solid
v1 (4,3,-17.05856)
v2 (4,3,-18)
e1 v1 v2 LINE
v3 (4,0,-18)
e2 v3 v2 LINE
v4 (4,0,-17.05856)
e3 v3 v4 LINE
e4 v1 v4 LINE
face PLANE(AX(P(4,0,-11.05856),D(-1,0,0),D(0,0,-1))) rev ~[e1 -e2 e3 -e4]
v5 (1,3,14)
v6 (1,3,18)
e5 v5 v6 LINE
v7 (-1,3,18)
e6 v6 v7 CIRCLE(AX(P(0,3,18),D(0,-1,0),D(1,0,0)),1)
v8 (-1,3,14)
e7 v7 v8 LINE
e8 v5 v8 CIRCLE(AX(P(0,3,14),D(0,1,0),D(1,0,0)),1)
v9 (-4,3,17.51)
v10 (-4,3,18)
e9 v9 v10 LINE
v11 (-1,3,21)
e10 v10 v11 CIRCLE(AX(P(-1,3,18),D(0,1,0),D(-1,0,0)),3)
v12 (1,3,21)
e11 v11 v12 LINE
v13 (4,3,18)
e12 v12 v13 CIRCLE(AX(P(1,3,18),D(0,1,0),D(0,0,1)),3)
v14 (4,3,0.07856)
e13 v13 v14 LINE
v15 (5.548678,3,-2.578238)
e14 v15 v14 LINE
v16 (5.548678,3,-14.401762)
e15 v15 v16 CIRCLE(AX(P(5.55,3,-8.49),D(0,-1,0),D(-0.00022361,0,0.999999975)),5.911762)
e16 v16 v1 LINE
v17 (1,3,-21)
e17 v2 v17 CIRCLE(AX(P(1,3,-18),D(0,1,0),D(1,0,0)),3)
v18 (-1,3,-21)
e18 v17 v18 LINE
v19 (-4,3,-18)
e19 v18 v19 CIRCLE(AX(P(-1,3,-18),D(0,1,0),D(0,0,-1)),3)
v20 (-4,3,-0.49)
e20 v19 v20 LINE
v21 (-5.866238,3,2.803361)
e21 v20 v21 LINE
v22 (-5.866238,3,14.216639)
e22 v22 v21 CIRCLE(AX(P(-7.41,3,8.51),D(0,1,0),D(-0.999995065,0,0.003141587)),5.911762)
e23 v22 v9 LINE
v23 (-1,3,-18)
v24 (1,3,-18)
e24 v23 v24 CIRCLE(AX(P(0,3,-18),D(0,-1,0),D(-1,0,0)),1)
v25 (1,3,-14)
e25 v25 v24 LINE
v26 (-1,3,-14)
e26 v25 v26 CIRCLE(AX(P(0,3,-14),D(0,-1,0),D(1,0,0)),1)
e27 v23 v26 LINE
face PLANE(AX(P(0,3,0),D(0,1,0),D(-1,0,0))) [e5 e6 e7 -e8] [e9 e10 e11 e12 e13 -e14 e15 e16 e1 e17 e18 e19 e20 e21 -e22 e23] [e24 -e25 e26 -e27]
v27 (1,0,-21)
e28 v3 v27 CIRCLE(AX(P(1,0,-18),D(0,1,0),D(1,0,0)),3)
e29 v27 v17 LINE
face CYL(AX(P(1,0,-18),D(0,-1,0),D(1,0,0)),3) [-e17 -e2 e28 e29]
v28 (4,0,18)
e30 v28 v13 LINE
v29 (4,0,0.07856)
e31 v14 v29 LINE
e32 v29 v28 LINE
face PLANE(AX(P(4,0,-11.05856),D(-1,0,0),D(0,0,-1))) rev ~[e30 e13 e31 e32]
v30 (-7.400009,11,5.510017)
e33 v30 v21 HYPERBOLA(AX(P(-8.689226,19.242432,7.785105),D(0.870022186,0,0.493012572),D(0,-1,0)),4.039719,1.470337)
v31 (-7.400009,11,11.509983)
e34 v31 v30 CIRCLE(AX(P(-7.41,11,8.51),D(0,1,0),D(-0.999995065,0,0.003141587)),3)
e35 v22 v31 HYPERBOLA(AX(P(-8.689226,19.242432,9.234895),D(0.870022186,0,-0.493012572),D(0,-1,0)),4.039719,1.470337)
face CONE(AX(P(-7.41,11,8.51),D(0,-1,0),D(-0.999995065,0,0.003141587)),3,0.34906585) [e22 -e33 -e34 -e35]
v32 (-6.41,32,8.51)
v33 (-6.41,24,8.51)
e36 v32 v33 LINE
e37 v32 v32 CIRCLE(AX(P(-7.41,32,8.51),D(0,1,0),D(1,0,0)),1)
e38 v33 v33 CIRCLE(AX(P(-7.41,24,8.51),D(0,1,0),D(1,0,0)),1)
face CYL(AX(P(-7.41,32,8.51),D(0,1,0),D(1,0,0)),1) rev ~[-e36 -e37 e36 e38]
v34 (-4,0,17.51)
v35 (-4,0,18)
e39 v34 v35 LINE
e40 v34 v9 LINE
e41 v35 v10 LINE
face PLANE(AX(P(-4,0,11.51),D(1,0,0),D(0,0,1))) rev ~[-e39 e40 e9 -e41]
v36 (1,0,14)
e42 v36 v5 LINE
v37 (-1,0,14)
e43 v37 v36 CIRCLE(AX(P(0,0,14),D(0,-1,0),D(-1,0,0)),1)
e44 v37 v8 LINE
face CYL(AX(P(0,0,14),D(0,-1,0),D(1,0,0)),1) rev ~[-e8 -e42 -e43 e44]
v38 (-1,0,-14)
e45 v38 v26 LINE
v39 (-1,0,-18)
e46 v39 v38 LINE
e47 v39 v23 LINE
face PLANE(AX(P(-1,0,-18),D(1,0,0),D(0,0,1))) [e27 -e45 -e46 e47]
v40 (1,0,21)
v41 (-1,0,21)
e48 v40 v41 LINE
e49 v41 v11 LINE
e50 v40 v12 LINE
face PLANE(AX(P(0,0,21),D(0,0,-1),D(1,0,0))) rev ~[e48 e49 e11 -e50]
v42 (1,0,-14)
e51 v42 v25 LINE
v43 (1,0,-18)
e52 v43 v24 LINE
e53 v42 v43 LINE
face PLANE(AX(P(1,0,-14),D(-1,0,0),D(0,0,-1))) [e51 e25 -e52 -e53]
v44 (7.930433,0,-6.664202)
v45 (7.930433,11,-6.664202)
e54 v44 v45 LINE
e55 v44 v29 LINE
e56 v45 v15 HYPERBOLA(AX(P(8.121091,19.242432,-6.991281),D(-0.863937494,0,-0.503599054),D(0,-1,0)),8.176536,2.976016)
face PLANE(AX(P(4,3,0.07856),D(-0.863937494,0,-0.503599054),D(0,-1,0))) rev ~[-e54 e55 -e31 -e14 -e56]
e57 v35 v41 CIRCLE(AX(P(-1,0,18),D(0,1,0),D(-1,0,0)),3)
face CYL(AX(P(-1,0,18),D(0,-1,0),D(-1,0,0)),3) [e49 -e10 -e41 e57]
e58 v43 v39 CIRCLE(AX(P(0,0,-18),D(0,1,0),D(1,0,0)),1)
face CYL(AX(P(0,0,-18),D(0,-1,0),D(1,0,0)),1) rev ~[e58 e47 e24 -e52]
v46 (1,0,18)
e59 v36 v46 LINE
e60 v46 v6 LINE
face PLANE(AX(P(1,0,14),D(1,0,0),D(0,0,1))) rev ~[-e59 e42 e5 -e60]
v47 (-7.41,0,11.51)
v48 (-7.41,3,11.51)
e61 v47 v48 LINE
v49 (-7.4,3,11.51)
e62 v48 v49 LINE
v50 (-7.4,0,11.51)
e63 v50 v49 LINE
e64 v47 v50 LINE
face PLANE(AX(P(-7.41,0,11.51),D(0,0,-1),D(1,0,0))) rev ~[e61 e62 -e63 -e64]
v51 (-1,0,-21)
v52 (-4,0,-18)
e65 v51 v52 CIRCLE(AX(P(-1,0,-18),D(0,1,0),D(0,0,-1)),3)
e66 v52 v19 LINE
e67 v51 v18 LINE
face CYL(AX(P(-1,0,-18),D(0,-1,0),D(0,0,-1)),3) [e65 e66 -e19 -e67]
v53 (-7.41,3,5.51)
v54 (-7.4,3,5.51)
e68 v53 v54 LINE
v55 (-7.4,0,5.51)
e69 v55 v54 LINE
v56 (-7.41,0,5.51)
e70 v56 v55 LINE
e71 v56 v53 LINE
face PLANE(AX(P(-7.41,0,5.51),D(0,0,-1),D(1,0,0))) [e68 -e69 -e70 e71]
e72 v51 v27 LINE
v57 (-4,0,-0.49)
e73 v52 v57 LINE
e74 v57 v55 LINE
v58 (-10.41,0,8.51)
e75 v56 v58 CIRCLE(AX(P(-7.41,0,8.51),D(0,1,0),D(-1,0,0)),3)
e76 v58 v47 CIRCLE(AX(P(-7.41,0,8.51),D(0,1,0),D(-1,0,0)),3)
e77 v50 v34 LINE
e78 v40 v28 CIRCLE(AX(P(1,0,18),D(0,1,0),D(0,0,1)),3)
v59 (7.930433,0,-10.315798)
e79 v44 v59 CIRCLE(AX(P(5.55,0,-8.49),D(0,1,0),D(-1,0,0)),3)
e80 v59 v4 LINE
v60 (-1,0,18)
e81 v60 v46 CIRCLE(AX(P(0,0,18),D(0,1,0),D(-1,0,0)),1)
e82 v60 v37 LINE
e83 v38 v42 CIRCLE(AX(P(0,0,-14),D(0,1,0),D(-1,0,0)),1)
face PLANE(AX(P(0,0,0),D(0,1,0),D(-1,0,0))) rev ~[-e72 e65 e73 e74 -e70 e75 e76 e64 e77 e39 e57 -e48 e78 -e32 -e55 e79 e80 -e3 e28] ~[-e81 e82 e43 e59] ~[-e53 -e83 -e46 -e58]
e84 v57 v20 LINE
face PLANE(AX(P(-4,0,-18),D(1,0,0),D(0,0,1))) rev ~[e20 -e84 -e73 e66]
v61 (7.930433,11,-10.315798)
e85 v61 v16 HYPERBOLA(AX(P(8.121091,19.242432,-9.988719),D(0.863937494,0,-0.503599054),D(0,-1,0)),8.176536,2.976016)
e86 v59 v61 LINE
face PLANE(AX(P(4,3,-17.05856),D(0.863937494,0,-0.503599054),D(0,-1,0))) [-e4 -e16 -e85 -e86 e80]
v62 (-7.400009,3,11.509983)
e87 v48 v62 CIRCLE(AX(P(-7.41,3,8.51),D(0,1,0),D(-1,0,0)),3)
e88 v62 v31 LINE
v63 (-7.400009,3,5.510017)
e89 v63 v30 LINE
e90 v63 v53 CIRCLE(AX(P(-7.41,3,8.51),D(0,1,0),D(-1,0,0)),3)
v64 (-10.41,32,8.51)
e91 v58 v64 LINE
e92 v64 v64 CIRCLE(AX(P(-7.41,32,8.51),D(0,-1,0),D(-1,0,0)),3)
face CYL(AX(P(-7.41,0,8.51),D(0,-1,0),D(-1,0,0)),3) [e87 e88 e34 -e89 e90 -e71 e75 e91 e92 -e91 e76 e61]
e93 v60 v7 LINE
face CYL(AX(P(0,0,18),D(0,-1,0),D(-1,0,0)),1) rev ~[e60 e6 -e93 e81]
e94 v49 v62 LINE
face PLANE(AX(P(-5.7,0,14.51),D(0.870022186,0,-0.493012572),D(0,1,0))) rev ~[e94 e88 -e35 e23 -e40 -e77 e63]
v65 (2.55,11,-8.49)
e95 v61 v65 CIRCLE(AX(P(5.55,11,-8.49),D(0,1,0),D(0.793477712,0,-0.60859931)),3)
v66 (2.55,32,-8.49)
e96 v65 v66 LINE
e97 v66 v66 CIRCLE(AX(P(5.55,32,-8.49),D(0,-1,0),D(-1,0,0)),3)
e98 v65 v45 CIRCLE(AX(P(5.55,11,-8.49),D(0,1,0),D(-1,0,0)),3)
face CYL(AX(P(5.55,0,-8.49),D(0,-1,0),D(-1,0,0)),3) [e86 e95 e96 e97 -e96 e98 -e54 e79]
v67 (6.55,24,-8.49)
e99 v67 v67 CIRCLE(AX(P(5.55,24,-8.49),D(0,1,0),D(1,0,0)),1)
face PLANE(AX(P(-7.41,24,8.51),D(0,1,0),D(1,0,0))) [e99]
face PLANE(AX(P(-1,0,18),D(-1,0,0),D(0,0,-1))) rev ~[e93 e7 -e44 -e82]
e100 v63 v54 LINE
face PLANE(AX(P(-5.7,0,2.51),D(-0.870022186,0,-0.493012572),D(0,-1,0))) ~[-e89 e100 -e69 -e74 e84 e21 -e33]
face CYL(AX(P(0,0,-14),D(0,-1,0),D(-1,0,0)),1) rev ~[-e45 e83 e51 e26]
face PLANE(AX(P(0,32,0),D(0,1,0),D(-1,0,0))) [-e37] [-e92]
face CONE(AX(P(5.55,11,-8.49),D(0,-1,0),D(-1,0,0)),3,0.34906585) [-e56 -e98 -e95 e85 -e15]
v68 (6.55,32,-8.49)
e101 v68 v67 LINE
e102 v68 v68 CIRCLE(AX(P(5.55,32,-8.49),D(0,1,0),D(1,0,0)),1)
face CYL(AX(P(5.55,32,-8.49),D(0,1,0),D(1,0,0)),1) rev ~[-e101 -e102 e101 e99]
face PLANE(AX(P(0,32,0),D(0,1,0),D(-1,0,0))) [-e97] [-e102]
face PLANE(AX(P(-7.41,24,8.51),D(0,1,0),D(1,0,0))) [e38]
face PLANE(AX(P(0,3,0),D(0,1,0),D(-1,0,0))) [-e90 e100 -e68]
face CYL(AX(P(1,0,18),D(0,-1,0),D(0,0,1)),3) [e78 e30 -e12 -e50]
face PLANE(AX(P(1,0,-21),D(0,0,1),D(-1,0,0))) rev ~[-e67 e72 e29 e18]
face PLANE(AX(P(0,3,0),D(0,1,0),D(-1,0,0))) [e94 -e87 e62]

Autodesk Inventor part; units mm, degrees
ref_plane "YZ Plane" through (0, 0, 0) normal (1, 0, 0) x (0, 1, 0)
ref_plane "XZ Plane" through (0, 0, 0) normal (0, 1, 0) x (-1, 0, 0)
ref_plane "XY Plane" through (0, 0, 0) normal (0, 0, 1) x (1, 0, 0)
sketch "Sketch1" plane through (0, 0, 0) normal (0, 1, 0) x (-1, 0, 0)
  arc A0 (-1, 14) -> (1, 14) centre (0, 14) ccw
  line L0 (0, -43.0187) -> (0, 32.3947) projected
  arc A1 (1, 18) -> (-1, 18) centre (0, 18) ccw
  line L1 (1, 18) -> (1, 14)
  line L2 (-1, 14) -> (-1, 18)
  line L3 (0, 18) -> (0, 16)
  line L4 (3.8037, 16) -> (0, 16) construction
  line L5 (14.482, 0) -> (-14.022, 0) construction
  arc A2 (1, -14) -> (-1, -14) centre (0, -14) ccw
  arc A3 (-1, -18) -> (1, -18) centre (0, -18) ccw
  line L6 (1, -18) -> (1, -14)
  line L7 (-1, -14) -> (-1, -18)
  line L8 (3.8037, -16) -> (0, -16) construction
  line L9 (1, 21) -> (-1, 21)
  line L10 (-4, 18) -> (-4, -18)
  line L11 (-1, -21) -> (1, -21)
  line L12 (4, -18) -> (4, 18)
  arc A4 (4, 18) -> (1, 21) centre (1, 18) ccw
  arc A5 (-1, 21) -> (-4, 18) centre (-1, 18) ccw
  arc A6 (-4, -18) -> (-1, -21) centre (-1, -18) ccw
  arc A7 (1, -21) -> (4, -18) centre (1, -18) ccw
  line L13 (9.95, -10.51) -> (-9.95, -10.51) construction
  line L14 (-9.95, -10.51) -> (-9.95, 10.51) construction
  line L15 (9.95, 10.51) -> (9.95, -10.51) construction
  circle A8 centre (7.41, 8.51) radius 1
  circle A9 centre (-5.55, -8.49) radius 0.75 construction
  line L16 (0, -32.2454) -> (0, -10.51) construction
  line L17 (9.95, 0) -> (-9.95, 0) construction
  line L18 (9.95, 10.51) -> (-9.95, 10.51) construction
  line L19 (4, 10.51) -> (9, 10.51) construction
  line L20 (9, 10.51) -> (9, 6.51) construction
  line L21 (9, 6.51) -> (4, 6.51) construction
  line L22 (4, 6.51) -> (4, 10.51)
  line L23 (7.41, 8.51) -> (9.1387, 8.51) construction
  circle A10 centre (7.41, 8.51) radius 3
  line L24 (7.41, 11.51) -> (4, 11.51)
  line L25 (7.41, 5.51) -> (4, 5.51)
  arc A11 (-4, -7.2261) -> (-4, -9.7539) centre (-5.55, -8.49) ccw construction
  line L26 (-5.55, -6.49) -> (-4, -6.49) construction
  line L27 (-5.55, -10.49) -> (-4, -10.49) construction
  circle A12 centre (-5.55, -8.49) radius 2 construction
  line L28 (-7.55, -8.49) -> (-7.55, -26.4012) construction
  circle A13 centre (-5.55, -8.49) radius 3
  circle A14 centre (-5.55, -8.49) radius 1
  point P0 (0, 0)
  point P1 (0, 21)
  point P2 (0, 19)
  point P3 (-5.55, -6.94)
  point P4 (-4, -6.94)
  point P5 (-5.55, -10.04)
  point P6 (-4, -10.04)
  point P7 (4, 5.51)
  point P8 (4, 11.51)
  point P9 (-4, -9.7539)
  point P10 (-4, -9.7539)
  dimension "d4" = 2
  dimension "d7" = 2
  dimension "d14" = 2
  dimension "d15" = 16
  dimension "d16" = 2
  dimension "d17" = 2
  dimension "d18" = 16
  dimension "d19" = 42
  dimension "d21" = 8
  dimension "d22" = 3
  dimension "d24" = 19.9
  dimension "d31" = 2.54
  dimension "d33" = 17
  dimension "d34" = 19.9
  dimension "d36" = 15.5
  dimension "d37" = 5
  dimension "d38" = 4
  dimension "d39" = 2
  dimension "d40" = 1.5
  dimension "d45" = 4
  dimension "d46" = 6
  dimension "d51" = 7.55
  dimension "d64" = 6
  dimension "d65" = 2
extrude "Extrusion2" add sketch "Sketch1" along normal blind 32 contours A10 | A8
extrude "Extrusion3" add sketch "Sketch1" along normal blind 32 contours A13 L10 | L10 A13 | A14
extrude "Extrusion4" add sketch "Sketch1" along normal blind 3 contours A0 L0 A2 L7 A3 L11 A6 L10 A13 A5 L9 A1 L2 | A0 L1 A1 L0 L9 A4 L12 A7 L11 A3 L6 A2 | L24 A10 L25 L12 | A13 L10 picked at (-3.0537, -8.3357)
chamfer "Chamfer1" distance 4 distance2 6 2 edges at (4, 1.5, -11.0586) (4, 1.5, -5.9214) measured on face at (8.55, 10.6667, -8.49)
chamfer_without_effect "Chamfer2"
chamfer "Chamfer3" distance 6 distance2 3.4 1 edges at (-4, 1.5, 5.51) measured on face at (-4, 1, -10.1633)
chamfer "Chamfer4" distance 3.4 distance2 6 1 edges at (-4, 1.5, 11.51) measured on face at (-6.2733, 1, 11.51)
chamfer "Chamfer5" distance 8 angle 20 1 edges at (-4.41, 3, 8.51)
chamfer "Chamfer6" distance 8 angle 20 2 edges at (4.586, 3, -5.6491) (4.586, 3, -11.3309) measured on face at (8.3281, 21.3333, -9.6224)
sketch "Sketch2" plane through (-7.41, 32, 8.51) normal (0, 1, 0) x (1, 0, 0)
  circle A0 centre (0, 0) radius 3 projected
  circle A1 centre (0, 0) radius 1
  circle A2 centre (12.96, 17) radius 3 projected
  circle A3 centre (12.96, 17) radius 1
  point P0 (7.41, 8.51)
  dimension "d72" = 2
  dimension "d73" = 2
extrude "Extrusion5" cut sketch "Sketch2" against normal blind 8 contours A1 | A3
properties part number "supporto_mb1202"
